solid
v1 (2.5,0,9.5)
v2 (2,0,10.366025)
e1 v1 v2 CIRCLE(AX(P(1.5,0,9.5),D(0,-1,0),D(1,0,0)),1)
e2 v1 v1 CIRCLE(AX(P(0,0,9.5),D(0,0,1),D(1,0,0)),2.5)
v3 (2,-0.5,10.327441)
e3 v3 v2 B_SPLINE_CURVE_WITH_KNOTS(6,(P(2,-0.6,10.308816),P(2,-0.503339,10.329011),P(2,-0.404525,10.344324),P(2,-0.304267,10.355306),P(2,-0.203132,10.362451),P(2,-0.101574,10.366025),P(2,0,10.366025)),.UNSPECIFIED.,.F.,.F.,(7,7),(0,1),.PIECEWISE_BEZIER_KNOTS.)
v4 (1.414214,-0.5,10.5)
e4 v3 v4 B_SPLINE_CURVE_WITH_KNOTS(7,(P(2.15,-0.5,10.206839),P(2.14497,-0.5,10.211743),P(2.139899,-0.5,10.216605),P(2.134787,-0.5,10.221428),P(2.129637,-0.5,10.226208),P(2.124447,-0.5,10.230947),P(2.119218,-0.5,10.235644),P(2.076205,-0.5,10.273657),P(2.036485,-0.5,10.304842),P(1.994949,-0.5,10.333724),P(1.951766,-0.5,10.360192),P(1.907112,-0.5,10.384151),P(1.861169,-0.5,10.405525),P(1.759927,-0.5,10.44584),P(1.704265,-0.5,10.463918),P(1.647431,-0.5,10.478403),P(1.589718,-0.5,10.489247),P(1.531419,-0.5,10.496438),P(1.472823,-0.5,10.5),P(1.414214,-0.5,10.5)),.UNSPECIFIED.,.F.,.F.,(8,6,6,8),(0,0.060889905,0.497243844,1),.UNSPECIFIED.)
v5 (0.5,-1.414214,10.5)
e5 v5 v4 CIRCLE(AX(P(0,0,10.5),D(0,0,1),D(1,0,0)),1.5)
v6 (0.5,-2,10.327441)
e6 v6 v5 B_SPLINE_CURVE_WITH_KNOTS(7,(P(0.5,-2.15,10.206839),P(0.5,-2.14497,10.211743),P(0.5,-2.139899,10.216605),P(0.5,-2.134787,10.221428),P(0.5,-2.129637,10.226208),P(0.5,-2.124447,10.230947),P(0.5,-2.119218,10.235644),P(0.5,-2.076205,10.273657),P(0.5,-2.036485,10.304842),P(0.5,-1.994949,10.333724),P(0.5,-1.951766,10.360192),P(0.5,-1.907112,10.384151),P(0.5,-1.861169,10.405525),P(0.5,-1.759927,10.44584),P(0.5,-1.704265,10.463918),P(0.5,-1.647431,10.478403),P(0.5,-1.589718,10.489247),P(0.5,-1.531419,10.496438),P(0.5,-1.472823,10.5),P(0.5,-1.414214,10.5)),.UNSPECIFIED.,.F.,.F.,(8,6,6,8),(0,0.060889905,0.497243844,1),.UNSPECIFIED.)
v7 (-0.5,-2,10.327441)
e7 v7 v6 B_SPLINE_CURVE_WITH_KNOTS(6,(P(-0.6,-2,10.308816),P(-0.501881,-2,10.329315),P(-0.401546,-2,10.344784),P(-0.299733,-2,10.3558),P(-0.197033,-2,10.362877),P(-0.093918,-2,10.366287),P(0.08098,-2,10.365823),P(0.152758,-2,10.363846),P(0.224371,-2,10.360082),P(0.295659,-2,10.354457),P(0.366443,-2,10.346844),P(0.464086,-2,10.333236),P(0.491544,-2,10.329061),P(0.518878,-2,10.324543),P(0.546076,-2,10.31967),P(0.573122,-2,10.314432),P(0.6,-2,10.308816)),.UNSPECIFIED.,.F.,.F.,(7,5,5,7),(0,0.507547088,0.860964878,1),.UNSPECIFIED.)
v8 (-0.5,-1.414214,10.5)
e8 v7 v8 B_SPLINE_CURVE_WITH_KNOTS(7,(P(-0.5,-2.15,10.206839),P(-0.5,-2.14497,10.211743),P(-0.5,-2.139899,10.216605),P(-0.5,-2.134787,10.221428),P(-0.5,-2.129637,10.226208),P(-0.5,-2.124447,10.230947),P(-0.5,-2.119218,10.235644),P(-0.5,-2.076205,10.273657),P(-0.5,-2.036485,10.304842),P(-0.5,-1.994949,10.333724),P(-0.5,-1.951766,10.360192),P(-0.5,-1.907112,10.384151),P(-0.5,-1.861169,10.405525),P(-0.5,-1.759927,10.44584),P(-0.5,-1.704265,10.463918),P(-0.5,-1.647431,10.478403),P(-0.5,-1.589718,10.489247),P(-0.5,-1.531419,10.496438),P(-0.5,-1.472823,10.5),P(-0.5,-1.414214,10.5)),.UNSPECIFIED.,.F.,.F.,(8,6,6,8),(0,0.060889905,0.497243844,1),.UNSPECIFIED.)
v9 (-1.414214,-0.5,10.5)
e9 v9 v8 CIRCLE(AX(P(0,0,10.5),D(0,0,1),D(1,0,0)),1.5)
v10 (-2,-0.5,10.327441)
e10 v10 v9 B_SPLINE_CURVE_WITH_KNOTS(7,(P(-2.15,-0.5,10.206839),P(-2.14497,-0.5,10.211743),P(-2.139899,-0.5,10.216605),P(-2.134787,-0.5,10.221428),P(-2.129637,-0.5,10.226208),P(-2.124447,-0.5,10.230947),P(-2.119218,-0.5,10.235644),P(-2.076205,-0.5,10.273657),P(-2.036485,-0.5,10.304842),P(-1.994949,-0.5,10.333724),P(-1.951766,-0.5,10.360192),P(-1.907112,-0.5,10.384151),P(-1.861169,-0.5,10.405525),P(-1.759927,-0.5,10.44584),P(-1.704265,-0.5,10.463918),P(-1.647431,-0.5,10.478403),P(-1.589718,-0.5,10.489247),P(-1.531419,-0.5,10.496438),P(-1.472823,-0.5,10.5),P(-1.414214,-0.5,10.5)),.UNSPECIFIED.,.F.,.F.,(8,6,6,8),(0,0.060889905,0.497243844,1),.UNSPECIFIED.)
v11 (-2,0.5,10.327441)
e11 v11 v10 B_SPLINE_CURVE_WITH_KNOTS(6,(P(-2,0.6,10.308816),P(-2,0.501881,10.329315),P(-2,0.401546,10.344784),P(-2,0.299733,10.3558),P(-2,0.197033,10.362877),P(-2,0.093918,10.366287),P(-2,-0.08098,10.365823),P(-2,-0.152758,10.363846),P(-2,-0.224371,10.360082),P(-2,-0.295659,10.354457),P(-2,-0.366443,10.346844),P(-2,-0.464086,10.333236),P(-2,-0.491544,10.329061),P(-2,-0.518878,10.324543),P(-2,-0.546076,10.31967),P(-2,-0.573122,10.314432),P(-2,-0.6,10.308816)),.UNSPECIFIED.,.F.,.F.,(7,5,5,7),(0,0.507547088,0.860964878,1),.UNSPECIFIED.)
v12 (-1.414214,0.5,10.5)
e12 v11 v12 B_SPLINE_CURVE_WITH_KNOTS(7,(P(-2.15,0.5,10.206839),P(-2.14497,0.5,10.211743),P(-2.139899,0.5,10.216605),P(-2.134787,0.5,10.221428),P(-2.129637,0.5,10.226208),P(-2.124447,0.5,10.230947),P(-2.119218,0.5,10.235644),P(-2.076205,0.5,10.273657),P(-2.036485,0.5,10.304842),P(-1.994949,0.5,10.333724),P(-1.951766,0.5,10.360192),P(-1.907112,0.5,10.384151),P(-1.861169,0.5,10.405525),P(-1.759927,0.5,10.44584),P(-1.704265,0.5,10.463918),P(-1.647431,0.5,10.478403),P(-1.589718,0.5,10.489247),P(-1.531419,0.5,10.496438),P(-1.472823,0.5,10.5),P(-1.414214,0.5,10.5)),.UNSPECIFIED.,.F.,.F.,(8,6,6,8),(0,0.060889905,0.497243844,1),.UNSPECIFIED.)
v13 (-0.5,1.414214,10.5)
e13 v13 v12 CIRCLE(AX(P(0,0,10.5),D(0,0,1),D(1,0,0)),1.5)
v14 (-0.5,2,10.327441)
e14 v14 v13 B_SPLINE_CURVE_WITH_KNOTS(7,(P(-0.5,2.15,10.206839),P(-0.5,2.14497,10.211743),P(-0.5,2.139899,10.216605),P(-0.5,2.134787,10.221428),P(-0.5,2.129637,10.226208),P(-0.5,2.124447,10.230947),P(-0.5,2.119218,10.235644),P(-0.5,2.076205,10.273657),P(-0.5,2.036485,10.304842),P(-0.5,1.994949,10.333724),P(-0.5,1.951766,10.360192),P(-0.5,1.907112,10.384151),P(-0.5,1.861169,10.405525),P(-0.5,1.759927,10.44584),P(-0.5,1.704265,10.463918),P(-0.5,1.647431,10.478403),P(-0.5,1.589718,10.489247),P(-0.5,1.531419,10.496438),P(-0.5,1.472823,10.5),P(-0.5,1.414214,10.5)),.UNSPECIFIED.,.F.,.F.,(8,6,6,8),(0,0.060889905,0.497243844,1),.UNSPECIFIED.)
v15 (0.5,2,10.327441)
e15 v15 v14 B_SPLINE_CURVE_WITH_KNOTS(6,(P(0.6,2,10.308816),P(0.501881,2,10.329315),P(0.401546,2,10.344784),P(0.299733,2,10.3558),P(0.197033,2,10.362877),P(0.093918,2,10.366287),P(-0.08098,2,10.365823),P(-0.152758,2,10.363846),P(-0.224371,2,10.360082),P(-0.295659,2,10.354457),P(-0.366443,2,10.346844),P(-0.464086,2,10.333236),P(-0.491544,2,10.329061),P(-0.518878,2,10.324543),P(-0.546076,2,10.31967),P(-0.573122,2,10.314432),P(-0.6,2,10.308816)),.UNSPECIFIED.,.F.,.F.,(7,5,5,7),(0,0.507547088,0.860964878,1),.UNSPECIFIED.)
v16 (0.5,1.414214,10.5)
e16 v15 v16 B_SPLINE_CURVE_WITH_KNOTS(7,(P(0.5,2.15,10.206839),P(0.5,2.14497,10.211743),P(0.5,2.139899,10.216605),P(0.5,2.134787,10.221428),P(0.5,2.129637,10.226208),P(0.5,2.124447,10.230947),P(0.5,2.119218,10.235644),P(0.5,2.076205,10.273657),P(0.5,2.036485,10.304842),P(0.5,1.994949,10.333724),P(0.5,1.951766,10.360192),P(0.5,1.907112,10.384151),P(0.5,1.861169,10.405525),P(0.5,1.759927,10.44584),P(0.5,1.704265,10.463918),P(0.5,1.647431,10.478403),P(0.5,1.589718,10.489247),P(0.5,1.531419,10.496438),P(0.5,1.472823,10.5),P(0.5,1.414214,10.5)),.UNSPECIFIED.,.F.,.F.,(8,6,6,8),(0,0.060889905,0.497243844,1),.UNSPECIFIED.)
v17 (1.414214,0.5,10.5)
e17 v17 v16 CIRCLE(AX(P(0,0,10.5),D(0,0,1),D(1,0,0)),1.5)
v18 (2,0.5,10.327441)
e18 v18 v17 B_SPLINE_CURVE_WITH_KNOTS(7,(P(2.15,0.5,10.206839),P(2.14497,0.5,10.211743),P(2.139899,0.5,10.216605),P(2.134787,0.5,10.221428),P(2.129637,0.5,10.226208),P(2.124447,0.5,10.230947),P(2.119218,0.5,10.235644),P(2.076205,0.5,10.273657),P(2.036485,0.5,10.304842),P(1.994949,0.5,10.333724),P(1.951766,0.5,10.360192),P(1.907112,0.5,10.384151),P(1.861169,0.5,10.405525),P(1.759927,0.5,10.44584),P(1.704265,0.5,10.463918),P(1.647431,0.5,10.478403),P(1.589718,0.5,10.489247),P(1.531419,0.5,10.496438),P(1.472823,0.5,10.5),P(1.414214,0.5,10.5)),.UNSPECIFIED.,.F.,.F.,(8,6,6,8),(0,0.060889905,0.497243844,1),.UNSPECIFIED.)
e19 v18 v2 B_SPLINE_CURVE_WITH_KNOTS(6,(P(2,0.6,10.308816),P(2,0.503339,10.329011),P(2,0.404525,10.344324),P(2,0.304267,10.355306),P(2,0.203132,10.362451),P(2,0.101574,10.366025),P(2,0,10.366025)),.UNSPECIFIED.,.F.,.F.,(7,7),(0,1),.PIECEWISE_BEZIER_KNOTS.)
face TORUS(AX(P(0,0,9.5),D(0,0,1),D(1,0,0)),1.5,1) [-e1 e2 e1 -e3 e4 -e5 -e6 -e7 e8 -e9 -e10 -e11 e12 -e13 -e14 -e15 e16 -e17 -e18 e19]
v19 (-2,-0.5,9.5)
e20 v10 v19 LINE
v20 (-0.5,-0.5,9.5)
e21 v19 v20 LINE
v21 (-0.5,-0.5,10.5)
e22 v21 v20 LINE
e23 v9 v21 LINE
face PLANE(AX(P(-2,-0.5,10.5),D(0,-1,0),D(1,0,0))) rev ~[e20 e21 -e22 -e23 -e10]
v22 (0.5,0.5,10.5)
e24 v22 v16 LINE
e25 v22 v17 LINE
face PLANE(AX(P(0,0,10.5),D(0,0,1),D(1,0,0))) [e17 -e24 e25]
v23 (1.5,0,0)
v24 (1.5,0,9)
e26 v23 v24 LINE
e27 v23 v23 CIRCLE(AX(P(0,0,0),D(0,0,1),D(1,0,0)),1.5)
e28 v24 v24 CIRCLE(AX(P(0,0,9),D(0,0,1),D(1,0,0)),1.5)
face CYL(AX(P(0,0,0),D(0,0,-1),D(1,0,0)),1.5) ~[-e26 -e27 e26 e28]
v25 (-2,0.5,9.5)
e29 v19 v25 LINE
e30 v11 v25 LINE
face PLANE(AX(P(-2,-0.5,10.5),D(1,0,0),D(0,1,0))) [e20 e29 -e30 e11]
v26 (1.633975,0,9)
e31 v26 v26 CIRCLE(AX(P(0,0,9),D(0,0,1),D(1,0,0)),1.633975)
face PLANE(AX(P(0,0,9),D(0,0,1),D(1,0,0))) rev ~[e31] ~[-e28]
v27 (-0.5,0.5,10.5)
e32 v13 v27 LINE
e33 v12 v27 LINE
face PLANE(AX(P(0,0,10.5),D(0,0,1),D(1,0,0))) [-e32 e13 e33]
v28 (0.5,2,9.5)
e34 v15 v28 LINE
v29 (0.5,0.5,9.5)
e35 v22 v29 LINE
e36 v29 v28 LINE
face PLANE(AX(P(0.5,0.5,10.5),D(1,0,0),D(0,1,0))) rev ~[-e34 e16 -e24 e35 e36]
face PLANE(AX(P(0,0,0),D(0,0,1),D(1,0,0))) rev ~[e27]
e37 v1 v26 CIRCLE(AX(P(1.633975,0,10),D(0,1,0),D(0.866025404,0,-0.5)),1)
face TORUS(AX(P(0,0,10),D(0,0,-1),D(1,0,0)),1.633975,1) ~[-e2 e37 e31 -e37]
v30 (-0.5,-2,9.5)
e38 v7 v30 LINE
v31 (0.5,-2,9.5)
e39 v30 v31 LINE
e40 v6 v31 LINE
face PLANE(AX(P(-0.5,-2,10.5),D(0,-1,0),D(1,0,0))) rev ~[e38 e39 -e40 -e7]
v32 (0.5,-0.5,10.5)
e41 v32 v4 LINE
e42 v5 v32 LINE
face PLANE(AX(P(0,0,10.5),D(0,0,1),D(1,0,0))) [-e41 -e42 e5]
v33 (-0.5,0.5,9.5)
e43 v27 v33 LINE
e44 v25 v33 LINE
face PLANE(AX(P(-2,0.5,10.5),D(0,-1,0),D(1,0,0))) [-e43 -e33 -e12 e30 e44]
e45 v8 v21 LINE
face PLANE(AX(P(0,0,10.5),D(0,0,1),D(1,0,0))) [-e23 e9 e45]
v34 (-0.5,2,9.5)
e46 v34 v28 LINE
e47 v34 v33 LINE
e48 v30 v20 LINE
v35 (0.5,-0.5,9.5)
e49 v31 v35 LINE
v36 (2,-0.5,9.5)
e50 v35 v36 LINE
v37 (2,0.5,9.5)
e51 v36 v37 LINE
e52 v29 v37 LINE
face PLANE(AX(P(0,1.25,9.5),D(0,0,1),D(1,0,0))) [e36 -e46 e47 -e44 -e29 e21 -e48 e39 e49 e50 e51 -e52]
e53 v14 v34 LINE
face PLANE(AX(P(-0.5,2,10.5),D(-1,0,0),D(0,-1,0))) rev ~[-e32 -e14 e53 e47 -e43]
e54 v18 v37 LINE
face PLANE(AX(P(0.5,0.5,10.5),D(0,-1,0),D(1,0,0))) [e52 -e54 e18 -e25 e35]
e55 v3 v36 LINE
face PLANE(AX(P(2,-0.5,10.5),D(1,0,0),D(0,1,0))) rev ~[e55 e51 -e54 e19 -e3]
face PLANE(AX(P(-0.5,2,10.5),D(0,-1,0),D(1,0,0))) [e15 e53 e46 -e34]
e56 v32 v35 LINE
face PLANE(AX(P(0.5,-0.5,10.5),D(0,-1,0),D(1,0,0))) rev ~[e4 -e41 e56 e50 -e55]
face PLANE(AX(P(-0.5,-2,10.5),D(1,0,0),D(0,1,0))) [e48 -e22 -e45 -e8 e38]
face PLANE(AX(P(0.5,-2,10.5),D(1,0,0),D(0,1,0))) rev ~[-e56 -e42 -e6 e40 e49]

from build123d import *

# Parameters (mm, degrees)
F0_R     = 1.5
F1_DEPTH = 9
F2_R     = 2.5
F3_DEPTH = 1.5
F4_W     = 1
F4_H     = 1.5
F4_H_2   = 1
F4_W_2   = 1.5
F5_DEPTH = 1


# Not quite as in the source:
# - a fillet or chamfer that OpenCascade refuses, or shapes differently, is made with other operations: its cross-section is extruded or revolved along the edge and cut away or added


with BuildPart() as f1:
    # F0 (on Top) → F1 (new body)
    with BuildSketch(Plane.XY):
        Circle(F0_R)
    extrude(amount=F1_DEPTH)

    # F2 (on face) → F3 (join)
    with BuildSketch(Plane.XY.offset(9)):
        Circle(F2_R)
    extrude(amount=F3_DEPTH)

    # F4 (on face) → F5 (cut)
    with BuildSketch(Plane.XY.offset(10.5)):
        with Locations((0, 1.25)):
            Rectangle(F4_W, F4_H)
        Rectangle(F4_W, F4_H_2)
        with Locations((-1.25, 0)):
            Rectangle(F4_W_2, F4_H_2)
        with Locations((1.25, 0)):
            Rectangle(F4_W_2, F4_H_2)
        with Locations((0, -1.25)):
            Rectangle(F4_W, F4_H)
    extrude(amount=-F5_DEPTH, mode=Mode.SUBTRACT)

    # F6: fillet of radius 1 on 1 edges, made by hand

    # F6_s1 → F6_t2 (revolve, cut)
    with BuildSketch(Plane.XZ):
        with BuildLine():
            ThreePointArc((2.5, 9.5), (2.2071067812, 10.2071067812), (1.5, 10.5))
            Line((1.5, 10.5), (2.5, 10.5))
            Line((2.5, 10.5), (2.5, 9.5))
        make_face()
    revolve(axis=Axis((0, 0, 10.5), (0, 0, 1)), mode=Mode.SUBTRACT)

    # F7: fillet of radius 1 on 1 edges, made by hand

    # F7_s1 → F7_t2 (revolve, cut)
    with BuildSketch(Plane.XZ):
        with BuildLine():
            ThreePointArc((2.5, 9.5), (2.1339745962, 9.1339745962), (1.6339745962, 9))
            Line((1.6339745962, 9), (2.5, 9))
            Line((2.5, 9), (2.5, 9.5))
        make_face()
    revolve(axis=Axis((0, 0, 9), (0, 0, 1)), mode=Mode.SUBTRACT)


solid = f1.part
